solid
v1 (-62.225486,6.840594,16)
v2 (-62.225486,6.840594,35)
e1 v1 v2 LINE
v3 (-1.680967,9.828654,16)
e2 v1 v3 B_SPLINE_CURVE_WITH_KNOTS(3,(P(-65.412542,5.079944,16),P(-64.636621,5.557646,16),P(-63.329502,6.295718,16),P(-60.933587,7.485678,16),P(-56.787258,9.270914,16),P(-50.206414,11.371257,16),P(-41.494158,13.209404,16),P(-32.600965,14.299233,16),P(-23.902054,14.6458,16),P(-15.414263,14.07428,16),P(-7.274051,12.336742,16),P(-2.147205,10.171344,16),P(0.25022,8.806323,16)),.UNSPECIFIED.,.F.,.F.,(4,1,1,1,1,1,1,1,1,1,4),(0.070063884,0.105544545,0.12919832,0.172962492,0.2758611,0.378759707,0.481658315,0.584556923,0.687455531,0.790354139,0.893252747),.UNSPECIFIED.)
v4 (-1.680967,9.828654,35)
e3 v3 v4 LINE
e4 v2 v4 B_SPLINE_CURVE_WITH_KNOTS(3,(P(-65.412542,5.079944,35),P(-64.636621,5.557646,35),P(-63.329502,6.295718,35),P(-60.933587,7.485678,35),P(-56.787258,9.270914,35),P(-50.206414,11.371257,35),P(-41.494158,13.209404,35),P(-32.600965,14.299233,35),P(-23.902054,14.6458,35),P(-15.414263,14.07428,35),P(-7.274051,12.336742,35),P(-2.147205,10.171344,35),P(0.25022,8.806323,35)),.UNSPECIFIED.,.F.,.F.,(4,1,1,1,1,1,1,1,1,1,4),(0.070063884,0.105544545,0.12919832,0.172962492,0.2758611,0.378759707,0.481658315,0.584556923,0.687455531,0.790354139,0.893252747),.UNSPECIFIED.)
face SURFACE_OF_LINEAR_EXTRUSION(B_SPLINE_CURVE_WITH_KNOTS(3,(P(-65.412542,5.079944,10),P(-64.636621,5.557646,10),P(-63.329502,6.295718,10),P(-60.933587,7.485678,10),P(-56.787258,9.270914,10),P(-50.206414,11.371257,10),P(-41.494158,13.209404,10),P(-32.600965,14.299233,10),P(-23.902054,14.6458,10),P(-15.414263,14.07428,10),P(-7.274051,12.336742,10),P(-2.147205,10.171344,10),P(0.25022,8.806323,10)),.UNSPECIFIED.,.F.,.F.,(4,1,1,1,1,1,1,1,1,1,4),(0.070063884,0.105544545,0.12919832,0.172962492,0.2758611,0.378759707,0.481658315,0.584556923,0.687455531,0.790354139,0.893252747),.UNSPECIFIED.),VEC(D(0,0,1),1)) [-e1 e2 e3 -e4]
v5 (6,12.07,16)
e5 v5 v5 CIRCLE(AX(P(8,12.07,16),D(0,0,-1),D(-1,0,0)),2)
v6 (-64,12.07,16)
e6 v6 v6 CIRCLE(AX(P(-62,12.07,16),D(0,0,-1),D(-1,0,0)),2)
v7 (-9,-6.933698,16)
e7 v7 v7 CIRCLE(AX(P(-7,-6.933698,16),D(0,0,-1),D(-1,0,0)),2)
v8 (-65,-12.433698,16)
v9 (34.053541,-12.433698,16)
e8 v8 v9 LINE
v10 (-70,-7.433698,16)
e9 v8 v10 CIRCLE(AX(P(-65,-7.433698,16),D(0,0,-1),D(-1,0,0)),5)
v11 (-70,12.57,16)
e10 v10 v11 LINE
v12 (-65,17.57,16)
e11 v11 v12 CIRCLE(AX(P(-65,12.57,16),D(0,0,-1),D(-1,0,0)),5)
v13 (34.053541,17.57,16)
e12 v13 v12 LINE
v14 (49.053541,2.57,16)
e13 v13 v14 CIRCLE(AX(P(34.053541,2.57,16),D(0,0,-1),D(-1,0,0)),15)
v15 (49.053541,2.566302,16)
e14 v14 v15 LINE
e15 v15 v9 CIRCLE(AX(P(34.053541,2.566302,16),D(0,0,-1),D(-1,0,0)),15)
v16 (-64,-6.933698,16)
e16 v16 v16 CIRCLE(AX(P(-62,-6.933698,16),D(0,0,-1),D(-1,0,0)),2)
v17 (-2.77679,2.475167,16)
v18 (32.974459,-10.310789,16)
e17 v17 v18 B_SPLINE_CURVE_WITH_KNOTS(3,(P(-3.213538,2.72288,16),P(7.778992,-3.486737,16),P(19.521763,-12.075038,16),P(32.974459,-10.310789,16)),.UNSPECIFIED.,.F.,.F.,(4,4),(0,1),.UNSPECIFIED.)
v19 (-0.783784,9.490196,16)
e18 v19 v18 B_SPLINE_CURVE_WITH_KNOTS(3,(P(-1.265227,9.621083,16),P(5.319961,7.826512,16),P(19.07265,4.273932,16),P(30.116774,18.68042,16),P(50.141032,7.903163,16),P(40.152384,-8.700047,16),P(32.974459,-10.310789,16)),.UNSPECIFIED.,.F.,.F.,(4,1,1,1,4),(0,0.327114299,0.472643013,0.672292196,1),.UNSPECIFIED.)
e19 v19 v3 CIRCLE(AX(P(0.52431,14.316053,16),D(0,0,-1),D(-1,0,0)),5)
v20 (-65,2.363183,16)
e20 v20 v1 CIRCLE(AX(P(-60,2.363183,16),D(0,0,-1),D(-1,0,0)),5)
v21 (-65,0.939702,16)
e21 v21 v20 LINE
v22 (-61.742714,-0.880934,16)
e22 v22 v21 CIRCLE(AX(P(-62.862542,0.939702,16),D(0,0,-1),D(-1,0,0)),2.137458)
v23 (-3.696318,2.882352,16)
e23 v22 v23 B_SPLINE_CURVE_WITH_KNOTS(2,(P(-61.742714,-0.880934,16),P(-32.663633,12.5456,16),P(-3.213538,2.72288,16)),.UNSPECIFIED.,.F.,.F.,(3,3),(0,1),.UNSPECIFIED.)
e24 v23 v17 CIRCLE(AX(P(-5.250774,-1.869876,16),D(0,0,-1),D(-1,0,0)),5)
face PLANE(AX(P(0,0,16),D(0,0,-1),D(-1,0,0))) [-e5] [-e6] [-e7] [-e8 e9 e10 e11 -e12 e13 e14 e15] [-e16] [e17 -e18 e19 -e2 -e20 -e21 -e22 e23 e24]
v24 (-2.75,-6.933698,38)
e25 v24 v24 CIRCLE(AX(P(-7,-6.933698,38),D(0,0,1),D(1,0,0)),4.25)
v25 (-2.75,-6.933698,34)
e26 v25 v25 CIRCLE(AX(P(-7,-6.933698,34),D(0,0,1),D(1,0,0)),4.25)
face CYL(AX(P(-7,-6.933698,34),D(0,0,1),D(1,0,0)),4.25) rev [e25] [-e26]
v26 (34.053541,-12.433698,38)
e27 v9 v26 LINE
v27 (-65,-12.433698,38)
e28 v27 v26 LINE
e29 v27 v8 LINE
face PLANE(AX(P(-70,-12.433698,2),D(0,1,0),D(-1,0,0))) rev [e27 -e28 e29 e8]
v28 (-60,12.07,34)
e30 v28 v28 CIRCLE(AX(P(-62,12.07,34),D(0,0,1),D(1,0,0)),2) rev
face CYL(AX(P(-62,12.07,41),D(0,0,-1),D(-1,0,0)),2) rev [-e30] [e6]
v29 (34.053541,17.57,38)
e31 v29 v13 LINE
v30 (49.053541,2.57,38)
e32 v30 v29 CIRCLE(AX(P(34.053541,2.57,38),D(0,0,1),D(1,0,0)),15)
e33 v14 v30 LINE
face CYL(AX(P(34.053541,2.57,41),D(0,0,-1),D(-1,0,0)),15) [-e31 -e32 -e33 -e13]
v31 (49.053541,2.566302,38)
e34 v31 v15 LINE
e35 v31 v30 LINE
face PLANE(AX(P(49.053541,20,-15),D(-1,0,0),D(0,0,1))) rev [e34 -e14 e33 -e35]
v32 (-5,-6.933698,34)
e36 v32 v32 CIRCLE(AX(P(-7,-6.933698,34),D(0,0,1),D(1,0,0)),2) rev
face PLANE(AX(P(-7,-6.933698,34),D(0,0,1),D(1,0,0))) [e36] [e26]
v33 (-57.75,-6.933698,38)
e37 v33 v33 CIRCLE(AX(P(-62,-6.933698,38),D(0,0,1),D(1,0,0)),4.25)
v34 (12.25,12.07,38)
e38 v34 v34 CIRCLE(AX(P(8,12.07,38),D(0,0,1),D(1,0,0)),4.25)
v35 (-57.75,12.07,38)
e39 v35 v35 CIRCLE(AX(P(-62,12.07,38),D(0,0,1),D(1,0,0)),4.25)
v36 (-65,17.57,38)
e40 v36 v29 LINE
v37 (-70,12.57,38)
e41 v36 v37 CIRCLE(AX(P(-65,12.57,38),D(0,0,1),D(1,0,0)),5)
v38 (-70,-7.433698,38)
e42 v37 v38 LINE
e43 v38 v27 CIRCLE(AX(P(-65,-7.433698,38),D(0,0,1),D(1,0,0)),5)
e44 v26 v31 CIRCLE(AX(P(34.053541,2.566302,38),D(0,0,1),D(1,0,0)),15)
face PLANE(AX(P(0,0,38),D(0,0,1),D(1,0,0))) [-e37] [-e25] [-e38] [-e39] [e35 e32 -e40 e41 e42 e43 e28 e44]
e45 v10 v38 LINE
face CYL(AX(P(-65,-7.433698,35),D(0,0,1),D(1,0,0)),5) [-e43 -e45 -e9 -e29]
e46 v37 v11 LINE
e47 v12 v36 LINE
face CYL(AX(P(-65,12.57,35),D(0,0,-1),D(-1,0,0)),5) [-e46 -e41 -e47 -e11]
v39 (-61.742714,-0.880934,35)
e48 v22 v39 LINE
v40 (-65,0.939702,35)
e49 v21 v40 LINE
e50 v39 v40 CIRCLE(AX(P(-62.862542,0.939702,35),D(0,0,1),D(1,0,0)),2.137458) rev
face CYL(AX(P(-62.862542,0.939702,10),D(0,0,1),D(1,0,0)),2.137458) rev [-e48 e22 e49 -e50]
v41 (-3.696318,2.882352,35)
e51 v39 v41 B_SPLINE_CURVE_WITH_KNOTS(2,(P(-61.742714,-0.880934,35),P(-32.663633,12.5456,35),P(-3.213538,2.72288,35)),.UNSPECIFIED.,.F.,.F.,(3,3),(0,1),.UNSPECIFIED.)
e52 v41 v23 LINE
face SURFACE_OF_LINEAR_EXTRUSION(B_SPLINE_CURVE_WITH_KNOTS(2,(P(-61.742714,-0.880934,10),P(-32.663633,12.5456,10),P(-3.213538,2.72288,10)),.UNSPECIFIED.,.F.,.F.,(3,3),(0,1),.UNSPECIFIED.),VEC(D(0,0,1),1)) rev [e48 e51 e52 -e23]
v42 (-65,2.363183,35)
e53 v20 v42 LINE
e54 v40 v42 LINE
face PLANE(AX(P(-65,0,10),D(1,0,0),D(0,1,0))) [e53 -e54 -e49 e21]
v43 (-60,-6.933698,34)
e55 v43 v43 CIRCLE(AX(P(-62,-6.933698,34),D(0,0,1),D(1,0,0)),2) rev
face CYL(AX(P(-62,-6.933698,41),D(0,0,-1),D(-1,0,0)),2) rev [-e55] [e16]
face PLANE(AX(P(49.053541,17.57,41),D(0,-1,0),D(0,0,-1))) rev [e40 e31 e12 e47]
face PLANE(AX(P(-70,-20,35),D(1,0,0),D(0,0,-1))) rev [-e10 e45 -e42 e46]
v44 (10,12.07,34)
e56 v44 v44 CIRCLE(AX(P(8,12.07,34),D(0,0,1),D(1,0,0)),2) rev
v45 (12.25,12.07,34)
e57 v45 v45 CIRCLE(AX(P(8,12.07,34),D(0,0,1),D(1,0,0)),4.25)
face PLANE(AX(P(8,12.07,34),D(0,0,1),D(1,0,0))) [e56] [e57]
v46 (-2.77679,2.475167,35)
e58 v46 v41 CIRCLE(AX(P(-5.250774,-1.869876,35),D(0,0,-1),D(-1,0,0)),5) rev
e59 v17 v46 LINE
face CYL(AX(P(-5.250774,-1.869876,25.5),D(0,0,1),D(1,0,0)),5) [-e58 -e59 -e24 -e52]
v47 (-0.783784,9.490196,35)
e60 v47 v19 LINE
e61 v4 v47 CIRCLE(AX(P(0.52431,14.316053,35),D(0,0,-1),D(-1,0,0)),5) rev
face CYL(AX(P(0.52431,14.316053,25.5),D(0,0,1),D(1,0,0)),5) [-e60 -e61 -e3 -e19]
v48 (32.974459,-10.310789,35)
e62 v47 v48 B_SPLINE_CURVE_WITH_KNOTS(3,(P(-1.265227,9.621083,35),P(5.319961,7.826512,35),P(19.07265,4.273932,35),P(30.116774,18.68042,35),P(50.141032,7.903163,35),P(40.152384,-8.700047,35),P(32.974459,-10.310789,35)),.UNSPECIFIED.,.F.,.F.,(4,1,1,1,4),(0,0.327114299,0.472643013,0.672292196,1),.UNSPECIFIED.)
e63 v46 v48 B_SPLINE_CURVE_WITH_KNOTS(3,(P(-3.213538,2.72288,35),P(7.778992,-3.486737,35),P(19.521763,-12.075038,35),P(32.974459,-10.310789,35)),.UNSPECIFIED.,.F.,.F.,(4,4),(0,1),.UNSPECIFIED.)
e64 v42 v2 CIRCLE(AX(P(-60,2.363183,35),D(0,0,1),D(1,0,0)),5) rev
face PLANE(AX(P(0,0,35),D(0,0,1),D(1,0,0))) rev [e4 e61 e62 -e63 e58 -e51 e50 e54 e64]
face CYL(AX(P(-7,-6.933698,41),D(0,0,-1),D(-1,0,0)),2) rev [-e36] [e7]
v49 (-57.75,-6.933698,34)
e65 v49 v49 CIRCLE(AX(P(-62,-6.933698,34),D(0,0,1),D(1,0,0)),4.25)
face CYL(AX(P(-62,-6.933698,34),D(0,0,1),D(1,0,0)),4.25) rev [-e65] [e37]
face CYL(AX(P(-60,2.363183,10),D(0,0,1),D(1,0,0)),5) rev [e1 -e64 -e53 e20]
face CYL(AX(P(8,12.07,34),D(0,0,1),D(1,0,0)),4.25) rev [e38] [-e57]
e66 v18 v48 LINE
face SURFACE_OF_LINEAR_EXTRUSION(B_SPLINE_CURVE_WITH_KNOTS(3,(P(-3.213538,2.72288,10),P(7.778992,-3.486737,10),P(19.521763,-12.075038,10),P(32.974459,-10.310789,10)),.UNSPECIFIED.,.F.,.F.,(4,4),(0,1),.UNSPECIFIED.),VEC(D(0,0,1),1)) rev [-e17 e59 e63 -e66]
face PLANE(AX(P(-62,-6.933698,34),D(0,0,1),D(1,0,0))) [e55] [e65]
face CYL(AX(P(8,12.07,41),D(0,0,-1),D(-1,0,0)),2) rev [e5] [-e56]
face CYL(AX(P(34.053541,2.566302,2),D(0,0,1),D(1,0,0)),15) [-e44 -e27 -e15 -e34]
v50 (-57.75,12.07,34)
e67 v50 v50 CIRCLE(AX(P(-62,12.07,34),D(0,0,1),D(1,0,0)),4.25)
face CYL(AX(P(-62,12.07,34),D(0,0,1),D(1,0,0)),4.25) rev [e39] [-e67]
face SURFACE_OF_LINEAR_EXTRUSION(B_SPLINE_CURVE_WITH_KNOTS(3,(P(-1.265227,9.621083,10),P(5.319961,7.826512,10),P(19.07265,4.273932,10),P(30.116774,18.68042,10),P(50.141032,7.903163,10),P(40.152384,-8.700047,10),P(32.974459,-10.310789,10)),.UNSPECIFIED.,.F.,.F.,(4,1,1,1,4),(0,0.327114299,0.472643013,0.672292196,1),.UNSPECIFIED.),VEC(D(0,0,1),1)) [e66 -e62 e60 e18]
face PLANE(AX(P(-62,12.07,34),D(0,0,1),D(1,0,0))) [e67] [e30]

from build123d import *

# Parameters (mm, degrees)
SKETCH_1_W          = 140
SKETCH_1_H          = 40
EXTRUDE_1_DEPTH     = 35
CUT_EXTRUDE_START   = -25
CUT_EXTRUDE_1_DEPTH = 25
SKETCH_3_W          = 20.946458808
SKETCH_3_H          = 40
CUT_EXTRUDE_2_DEPTH = 50
SKETCH_4_W          = 119.053541192
SKETCH_4_H          = 40
CUT_EXTRUDE_3_DEPTH = 16
SKETCH_5_W          = 119.053541192
SKETCH_5_H          = 7.566301572
CUT_EXTRUDE_4_DEPTH = 33
FILLET_1_R          = 5
SKETCH_6_W          = 119.053541192
SKETCH_6_H          = 32.433698428
EXTRUDE_2_DEPTH     = 3
SKETCH_7_W          = 119.053541192
SKETCH_7_H          = 2.43
CUT_EXTRUDE_5_DEPTH = 25
FILLET_2_R          = 15
SKETCH_8_R          = 2
CUT_EXTRUDE_6_DEPTH = 25
SKETCH_9_R          = 4.25
CUT_EXTRUDE_7_DEPTH = 4
FILLET_3_R          = 5


# Read off the part's stored shape, not the designer's step: 切除-拉伸1
with BuildPart() as part:
    # 草图1 → 凸台-拉伸1 (new body)
    with BuildSketch(Plane.XY):
        Rectangle(SKETCH_1_W, SKETCH_1_H)
    extrude(amount=EXTRUDE_1_DEPTH)

    # 切除-拉伸1 outline → 切除-拉伸1 (cut)
    with BuildSketch(Plane.XY.offset(35).offset(CUT_EXTRUDE_START)):
        with BuildLine():
            ThreePointArc((-65, 0.939701666), (-63.90540849, -0.926084141), (-61.742713718, -0.880933602))
            add(Edge.make_bspline(
                [(-61.742713718, -0.880933602), (-32.663633491, 12.545599653), (-3.21353823, 2.722880029)],
                knots=[0, 0, 0, 1, 1, 1], degree=2))
            add(Edge.make_bspline(
                [(-3.21353823, 2.722880029), (7.778991577, -3.486736981), (19.521763095, -12.075038105), (32.974458778, -10.310789055)],
                knots=[0, 0, 0, 0, 1, 1, 1, 1], degree=3))
            add(Edge.make_bspline(
                [(-1.265226953, 9.621082728), (5.319961167, 7.826511536), (19.072649984, 4.273931772), (30.116773563, 18.680420492), (50.141031873, 7.903163107), (40.152384038, -8.700046956), (32.974458778, -10.310789055)],
                knots=[0, 0, 0, 0, 0.327114299, 0.472643013, 0.672292196, 1, 1, 1, 1], degree=3))
            add(Edge.make_bspline(
                [(-62.225486261, 6.840593766), (-61.950401652, 6.977325912), (-60.645663364, 7.609645854), (-56.787258029, 9.270913685), (-50.206414035, 11.371256832), (-41.494158434, 13.209404155), (-32.600965324, 14.299233241), (-23.90205386, 14.645800276), (-15.41426271, 14.074279585), (-7.837972032, 12.457111584), (-3.215945129, 10.610499943), (-1.265226953, 9.621082728)],
                knots=[0.117371432, 0.117371432, 0.117371432, 0.117371432, 0.12919832, 0.172962492, 0.2758611, 0.378759707, 0.481658315, 0.584556923, 0.687455531, 0.790354139, 0.871867558, 0.871867558, 0.871867558, 0.871867558], degree=3))
            ThreePointArc((-62.225486261, 6.840593766), (-64.250143015, 4.996865242), (-65, 2.363182583))
            Line((-65, 2.363182583), (-65, 0.939701666))
        make_face()
    extrude(amount=CUT_EXTRUDE_1_DEPTH, mode=Mode.SUBTRACT)

    # 草图3 → 切除-拉伸2 (cut)
    with BuildSketch(Plane.XY.offset(35)):
        with Locations((59.526770596, 0)):
            Rectangle(SKETCH_3_W, SKETCH_3_H)
    extrude(amount=-CUT_EXTRUDE_2_DEPTH, mode=Mode.SUBTRACT)

    # 草图4 → 切除-拉伸3 (cut)
    with BuildSketch(Plane(origin=(0, 0, 0), x_dir=(-1, 0, 0), z_dir=(0, 0, -1))):
        with Locations((10.473229404, 0)):
            Rectangle(SKETCH_4_W, SKETCH_4_H)
    extrude(amount=-CUT_EXTRUDE_3_DEPTH, mode=Mode.SUBTRACT)

    # 草图5 → 切除-拉伸4 (cut)
    with BuildSketch(Plane.XY.offset(35)):
        with Locations((-10.473229404, -16.216849214)):
            Rectangle(SKETCH_5_W, SKETCH_5_H)
    extrude(amount=-CUT_EXTRUDE_4_DEPTH, mode=Mode.SUBTRACT)

    # 圆角1
    fillet_1_edges = [part.edges().sort_by_distance(p)[0] for p in [
        (-3.21353823, 2.722880029, 25.5),
        (-1.265226953, 9.621082728, 25.5),
    ]]
    fillet(fillet_1_edges, radius=FILLET_1_R)

    # 草图6 → 凸台-拉伸2 (add)
    with BuildSketch(Plane.XY.offset(35)):
        with Locations((-10.473229404, 3.783150786)):
            Rectangle(SKETCH_6_W, SKETCH_6_H)
    extrude(amount=EXTRUDE_2_DEPTH)

    # 草图7 → 切除-拉伸5 (cut)
    with BuildSketch(Plane(origin=(0, 0, 16), x_dir=(-1, 0, 0), z_dir=(0, 0, -1))):
        with Locations((10.473229404, 18.785)):
            Rectangle(SKETCH_7_W, SKETCH_7_H)
    extrude(amount=-CUT_EXTRUDE_5_DEPTH, mode=Mode.SUBTRACT)

    # 圆角2
    fillet_2_edges = [part.edges().sort_by_distance(p)[0] for p in [
        (49.053541192, 17.57, 27),
        (49.053541192, -12.433698428, 27),
    ]]
    fillet(fillet_2_edges, radius=FILLET_2_R)

    # 草图8 → 切除-拉伸6 (cut)
    with BuildSketch(Plane(origin=(0, 0, 16), x_dir=(-1, 0, 0), z_dir=(0, 0, -1))):
        with Locations((62, 12.07)):
            Circle(SKETCH_8_R)
        with Locations((-8, 12.07)):
            Circle(SKETCH_8_R)
        with Locations((62, -6.933698428)):
            Circle(SKETCH_8_R)
        with Locations((7, -6.933698428)):
            Circle(SKETCH_8_R)
    extrude(amount=-CUT_EXTRUDE_6_DEPTH, mode=Mode.SUBTRACT)

    # 草图9 → 切除-拉伸7 (cut)
    with BuildSketch(Plane.XY.offset(38)):
        with Locations((-62, 12.07)):
            Circle(SKETCH_9_R)
        with Locations((-62, -6.933698428)):
            Circle(SKETCH_9_R)
        with Locations((8, 12.07)):
            Circle(SKETCH_9_R)
        with Locations((-7, -6.933698428)):
            Circle(SKETCH_9_R)
    extrude(amount=-CUT_EXTRUDE_7_DEPTH, mode=Mode.SUBTRACT)

    # 圆角3
    fillet_3_edges = [part.edges().sort_by_distance(p)[0] for p in [
        (-70, 17.57, 27),
        (-70, -12.433698428, 27),
    ]]
    fillet(fillet_3_edges, radius=FILLET_3_R)


solid = part.part
